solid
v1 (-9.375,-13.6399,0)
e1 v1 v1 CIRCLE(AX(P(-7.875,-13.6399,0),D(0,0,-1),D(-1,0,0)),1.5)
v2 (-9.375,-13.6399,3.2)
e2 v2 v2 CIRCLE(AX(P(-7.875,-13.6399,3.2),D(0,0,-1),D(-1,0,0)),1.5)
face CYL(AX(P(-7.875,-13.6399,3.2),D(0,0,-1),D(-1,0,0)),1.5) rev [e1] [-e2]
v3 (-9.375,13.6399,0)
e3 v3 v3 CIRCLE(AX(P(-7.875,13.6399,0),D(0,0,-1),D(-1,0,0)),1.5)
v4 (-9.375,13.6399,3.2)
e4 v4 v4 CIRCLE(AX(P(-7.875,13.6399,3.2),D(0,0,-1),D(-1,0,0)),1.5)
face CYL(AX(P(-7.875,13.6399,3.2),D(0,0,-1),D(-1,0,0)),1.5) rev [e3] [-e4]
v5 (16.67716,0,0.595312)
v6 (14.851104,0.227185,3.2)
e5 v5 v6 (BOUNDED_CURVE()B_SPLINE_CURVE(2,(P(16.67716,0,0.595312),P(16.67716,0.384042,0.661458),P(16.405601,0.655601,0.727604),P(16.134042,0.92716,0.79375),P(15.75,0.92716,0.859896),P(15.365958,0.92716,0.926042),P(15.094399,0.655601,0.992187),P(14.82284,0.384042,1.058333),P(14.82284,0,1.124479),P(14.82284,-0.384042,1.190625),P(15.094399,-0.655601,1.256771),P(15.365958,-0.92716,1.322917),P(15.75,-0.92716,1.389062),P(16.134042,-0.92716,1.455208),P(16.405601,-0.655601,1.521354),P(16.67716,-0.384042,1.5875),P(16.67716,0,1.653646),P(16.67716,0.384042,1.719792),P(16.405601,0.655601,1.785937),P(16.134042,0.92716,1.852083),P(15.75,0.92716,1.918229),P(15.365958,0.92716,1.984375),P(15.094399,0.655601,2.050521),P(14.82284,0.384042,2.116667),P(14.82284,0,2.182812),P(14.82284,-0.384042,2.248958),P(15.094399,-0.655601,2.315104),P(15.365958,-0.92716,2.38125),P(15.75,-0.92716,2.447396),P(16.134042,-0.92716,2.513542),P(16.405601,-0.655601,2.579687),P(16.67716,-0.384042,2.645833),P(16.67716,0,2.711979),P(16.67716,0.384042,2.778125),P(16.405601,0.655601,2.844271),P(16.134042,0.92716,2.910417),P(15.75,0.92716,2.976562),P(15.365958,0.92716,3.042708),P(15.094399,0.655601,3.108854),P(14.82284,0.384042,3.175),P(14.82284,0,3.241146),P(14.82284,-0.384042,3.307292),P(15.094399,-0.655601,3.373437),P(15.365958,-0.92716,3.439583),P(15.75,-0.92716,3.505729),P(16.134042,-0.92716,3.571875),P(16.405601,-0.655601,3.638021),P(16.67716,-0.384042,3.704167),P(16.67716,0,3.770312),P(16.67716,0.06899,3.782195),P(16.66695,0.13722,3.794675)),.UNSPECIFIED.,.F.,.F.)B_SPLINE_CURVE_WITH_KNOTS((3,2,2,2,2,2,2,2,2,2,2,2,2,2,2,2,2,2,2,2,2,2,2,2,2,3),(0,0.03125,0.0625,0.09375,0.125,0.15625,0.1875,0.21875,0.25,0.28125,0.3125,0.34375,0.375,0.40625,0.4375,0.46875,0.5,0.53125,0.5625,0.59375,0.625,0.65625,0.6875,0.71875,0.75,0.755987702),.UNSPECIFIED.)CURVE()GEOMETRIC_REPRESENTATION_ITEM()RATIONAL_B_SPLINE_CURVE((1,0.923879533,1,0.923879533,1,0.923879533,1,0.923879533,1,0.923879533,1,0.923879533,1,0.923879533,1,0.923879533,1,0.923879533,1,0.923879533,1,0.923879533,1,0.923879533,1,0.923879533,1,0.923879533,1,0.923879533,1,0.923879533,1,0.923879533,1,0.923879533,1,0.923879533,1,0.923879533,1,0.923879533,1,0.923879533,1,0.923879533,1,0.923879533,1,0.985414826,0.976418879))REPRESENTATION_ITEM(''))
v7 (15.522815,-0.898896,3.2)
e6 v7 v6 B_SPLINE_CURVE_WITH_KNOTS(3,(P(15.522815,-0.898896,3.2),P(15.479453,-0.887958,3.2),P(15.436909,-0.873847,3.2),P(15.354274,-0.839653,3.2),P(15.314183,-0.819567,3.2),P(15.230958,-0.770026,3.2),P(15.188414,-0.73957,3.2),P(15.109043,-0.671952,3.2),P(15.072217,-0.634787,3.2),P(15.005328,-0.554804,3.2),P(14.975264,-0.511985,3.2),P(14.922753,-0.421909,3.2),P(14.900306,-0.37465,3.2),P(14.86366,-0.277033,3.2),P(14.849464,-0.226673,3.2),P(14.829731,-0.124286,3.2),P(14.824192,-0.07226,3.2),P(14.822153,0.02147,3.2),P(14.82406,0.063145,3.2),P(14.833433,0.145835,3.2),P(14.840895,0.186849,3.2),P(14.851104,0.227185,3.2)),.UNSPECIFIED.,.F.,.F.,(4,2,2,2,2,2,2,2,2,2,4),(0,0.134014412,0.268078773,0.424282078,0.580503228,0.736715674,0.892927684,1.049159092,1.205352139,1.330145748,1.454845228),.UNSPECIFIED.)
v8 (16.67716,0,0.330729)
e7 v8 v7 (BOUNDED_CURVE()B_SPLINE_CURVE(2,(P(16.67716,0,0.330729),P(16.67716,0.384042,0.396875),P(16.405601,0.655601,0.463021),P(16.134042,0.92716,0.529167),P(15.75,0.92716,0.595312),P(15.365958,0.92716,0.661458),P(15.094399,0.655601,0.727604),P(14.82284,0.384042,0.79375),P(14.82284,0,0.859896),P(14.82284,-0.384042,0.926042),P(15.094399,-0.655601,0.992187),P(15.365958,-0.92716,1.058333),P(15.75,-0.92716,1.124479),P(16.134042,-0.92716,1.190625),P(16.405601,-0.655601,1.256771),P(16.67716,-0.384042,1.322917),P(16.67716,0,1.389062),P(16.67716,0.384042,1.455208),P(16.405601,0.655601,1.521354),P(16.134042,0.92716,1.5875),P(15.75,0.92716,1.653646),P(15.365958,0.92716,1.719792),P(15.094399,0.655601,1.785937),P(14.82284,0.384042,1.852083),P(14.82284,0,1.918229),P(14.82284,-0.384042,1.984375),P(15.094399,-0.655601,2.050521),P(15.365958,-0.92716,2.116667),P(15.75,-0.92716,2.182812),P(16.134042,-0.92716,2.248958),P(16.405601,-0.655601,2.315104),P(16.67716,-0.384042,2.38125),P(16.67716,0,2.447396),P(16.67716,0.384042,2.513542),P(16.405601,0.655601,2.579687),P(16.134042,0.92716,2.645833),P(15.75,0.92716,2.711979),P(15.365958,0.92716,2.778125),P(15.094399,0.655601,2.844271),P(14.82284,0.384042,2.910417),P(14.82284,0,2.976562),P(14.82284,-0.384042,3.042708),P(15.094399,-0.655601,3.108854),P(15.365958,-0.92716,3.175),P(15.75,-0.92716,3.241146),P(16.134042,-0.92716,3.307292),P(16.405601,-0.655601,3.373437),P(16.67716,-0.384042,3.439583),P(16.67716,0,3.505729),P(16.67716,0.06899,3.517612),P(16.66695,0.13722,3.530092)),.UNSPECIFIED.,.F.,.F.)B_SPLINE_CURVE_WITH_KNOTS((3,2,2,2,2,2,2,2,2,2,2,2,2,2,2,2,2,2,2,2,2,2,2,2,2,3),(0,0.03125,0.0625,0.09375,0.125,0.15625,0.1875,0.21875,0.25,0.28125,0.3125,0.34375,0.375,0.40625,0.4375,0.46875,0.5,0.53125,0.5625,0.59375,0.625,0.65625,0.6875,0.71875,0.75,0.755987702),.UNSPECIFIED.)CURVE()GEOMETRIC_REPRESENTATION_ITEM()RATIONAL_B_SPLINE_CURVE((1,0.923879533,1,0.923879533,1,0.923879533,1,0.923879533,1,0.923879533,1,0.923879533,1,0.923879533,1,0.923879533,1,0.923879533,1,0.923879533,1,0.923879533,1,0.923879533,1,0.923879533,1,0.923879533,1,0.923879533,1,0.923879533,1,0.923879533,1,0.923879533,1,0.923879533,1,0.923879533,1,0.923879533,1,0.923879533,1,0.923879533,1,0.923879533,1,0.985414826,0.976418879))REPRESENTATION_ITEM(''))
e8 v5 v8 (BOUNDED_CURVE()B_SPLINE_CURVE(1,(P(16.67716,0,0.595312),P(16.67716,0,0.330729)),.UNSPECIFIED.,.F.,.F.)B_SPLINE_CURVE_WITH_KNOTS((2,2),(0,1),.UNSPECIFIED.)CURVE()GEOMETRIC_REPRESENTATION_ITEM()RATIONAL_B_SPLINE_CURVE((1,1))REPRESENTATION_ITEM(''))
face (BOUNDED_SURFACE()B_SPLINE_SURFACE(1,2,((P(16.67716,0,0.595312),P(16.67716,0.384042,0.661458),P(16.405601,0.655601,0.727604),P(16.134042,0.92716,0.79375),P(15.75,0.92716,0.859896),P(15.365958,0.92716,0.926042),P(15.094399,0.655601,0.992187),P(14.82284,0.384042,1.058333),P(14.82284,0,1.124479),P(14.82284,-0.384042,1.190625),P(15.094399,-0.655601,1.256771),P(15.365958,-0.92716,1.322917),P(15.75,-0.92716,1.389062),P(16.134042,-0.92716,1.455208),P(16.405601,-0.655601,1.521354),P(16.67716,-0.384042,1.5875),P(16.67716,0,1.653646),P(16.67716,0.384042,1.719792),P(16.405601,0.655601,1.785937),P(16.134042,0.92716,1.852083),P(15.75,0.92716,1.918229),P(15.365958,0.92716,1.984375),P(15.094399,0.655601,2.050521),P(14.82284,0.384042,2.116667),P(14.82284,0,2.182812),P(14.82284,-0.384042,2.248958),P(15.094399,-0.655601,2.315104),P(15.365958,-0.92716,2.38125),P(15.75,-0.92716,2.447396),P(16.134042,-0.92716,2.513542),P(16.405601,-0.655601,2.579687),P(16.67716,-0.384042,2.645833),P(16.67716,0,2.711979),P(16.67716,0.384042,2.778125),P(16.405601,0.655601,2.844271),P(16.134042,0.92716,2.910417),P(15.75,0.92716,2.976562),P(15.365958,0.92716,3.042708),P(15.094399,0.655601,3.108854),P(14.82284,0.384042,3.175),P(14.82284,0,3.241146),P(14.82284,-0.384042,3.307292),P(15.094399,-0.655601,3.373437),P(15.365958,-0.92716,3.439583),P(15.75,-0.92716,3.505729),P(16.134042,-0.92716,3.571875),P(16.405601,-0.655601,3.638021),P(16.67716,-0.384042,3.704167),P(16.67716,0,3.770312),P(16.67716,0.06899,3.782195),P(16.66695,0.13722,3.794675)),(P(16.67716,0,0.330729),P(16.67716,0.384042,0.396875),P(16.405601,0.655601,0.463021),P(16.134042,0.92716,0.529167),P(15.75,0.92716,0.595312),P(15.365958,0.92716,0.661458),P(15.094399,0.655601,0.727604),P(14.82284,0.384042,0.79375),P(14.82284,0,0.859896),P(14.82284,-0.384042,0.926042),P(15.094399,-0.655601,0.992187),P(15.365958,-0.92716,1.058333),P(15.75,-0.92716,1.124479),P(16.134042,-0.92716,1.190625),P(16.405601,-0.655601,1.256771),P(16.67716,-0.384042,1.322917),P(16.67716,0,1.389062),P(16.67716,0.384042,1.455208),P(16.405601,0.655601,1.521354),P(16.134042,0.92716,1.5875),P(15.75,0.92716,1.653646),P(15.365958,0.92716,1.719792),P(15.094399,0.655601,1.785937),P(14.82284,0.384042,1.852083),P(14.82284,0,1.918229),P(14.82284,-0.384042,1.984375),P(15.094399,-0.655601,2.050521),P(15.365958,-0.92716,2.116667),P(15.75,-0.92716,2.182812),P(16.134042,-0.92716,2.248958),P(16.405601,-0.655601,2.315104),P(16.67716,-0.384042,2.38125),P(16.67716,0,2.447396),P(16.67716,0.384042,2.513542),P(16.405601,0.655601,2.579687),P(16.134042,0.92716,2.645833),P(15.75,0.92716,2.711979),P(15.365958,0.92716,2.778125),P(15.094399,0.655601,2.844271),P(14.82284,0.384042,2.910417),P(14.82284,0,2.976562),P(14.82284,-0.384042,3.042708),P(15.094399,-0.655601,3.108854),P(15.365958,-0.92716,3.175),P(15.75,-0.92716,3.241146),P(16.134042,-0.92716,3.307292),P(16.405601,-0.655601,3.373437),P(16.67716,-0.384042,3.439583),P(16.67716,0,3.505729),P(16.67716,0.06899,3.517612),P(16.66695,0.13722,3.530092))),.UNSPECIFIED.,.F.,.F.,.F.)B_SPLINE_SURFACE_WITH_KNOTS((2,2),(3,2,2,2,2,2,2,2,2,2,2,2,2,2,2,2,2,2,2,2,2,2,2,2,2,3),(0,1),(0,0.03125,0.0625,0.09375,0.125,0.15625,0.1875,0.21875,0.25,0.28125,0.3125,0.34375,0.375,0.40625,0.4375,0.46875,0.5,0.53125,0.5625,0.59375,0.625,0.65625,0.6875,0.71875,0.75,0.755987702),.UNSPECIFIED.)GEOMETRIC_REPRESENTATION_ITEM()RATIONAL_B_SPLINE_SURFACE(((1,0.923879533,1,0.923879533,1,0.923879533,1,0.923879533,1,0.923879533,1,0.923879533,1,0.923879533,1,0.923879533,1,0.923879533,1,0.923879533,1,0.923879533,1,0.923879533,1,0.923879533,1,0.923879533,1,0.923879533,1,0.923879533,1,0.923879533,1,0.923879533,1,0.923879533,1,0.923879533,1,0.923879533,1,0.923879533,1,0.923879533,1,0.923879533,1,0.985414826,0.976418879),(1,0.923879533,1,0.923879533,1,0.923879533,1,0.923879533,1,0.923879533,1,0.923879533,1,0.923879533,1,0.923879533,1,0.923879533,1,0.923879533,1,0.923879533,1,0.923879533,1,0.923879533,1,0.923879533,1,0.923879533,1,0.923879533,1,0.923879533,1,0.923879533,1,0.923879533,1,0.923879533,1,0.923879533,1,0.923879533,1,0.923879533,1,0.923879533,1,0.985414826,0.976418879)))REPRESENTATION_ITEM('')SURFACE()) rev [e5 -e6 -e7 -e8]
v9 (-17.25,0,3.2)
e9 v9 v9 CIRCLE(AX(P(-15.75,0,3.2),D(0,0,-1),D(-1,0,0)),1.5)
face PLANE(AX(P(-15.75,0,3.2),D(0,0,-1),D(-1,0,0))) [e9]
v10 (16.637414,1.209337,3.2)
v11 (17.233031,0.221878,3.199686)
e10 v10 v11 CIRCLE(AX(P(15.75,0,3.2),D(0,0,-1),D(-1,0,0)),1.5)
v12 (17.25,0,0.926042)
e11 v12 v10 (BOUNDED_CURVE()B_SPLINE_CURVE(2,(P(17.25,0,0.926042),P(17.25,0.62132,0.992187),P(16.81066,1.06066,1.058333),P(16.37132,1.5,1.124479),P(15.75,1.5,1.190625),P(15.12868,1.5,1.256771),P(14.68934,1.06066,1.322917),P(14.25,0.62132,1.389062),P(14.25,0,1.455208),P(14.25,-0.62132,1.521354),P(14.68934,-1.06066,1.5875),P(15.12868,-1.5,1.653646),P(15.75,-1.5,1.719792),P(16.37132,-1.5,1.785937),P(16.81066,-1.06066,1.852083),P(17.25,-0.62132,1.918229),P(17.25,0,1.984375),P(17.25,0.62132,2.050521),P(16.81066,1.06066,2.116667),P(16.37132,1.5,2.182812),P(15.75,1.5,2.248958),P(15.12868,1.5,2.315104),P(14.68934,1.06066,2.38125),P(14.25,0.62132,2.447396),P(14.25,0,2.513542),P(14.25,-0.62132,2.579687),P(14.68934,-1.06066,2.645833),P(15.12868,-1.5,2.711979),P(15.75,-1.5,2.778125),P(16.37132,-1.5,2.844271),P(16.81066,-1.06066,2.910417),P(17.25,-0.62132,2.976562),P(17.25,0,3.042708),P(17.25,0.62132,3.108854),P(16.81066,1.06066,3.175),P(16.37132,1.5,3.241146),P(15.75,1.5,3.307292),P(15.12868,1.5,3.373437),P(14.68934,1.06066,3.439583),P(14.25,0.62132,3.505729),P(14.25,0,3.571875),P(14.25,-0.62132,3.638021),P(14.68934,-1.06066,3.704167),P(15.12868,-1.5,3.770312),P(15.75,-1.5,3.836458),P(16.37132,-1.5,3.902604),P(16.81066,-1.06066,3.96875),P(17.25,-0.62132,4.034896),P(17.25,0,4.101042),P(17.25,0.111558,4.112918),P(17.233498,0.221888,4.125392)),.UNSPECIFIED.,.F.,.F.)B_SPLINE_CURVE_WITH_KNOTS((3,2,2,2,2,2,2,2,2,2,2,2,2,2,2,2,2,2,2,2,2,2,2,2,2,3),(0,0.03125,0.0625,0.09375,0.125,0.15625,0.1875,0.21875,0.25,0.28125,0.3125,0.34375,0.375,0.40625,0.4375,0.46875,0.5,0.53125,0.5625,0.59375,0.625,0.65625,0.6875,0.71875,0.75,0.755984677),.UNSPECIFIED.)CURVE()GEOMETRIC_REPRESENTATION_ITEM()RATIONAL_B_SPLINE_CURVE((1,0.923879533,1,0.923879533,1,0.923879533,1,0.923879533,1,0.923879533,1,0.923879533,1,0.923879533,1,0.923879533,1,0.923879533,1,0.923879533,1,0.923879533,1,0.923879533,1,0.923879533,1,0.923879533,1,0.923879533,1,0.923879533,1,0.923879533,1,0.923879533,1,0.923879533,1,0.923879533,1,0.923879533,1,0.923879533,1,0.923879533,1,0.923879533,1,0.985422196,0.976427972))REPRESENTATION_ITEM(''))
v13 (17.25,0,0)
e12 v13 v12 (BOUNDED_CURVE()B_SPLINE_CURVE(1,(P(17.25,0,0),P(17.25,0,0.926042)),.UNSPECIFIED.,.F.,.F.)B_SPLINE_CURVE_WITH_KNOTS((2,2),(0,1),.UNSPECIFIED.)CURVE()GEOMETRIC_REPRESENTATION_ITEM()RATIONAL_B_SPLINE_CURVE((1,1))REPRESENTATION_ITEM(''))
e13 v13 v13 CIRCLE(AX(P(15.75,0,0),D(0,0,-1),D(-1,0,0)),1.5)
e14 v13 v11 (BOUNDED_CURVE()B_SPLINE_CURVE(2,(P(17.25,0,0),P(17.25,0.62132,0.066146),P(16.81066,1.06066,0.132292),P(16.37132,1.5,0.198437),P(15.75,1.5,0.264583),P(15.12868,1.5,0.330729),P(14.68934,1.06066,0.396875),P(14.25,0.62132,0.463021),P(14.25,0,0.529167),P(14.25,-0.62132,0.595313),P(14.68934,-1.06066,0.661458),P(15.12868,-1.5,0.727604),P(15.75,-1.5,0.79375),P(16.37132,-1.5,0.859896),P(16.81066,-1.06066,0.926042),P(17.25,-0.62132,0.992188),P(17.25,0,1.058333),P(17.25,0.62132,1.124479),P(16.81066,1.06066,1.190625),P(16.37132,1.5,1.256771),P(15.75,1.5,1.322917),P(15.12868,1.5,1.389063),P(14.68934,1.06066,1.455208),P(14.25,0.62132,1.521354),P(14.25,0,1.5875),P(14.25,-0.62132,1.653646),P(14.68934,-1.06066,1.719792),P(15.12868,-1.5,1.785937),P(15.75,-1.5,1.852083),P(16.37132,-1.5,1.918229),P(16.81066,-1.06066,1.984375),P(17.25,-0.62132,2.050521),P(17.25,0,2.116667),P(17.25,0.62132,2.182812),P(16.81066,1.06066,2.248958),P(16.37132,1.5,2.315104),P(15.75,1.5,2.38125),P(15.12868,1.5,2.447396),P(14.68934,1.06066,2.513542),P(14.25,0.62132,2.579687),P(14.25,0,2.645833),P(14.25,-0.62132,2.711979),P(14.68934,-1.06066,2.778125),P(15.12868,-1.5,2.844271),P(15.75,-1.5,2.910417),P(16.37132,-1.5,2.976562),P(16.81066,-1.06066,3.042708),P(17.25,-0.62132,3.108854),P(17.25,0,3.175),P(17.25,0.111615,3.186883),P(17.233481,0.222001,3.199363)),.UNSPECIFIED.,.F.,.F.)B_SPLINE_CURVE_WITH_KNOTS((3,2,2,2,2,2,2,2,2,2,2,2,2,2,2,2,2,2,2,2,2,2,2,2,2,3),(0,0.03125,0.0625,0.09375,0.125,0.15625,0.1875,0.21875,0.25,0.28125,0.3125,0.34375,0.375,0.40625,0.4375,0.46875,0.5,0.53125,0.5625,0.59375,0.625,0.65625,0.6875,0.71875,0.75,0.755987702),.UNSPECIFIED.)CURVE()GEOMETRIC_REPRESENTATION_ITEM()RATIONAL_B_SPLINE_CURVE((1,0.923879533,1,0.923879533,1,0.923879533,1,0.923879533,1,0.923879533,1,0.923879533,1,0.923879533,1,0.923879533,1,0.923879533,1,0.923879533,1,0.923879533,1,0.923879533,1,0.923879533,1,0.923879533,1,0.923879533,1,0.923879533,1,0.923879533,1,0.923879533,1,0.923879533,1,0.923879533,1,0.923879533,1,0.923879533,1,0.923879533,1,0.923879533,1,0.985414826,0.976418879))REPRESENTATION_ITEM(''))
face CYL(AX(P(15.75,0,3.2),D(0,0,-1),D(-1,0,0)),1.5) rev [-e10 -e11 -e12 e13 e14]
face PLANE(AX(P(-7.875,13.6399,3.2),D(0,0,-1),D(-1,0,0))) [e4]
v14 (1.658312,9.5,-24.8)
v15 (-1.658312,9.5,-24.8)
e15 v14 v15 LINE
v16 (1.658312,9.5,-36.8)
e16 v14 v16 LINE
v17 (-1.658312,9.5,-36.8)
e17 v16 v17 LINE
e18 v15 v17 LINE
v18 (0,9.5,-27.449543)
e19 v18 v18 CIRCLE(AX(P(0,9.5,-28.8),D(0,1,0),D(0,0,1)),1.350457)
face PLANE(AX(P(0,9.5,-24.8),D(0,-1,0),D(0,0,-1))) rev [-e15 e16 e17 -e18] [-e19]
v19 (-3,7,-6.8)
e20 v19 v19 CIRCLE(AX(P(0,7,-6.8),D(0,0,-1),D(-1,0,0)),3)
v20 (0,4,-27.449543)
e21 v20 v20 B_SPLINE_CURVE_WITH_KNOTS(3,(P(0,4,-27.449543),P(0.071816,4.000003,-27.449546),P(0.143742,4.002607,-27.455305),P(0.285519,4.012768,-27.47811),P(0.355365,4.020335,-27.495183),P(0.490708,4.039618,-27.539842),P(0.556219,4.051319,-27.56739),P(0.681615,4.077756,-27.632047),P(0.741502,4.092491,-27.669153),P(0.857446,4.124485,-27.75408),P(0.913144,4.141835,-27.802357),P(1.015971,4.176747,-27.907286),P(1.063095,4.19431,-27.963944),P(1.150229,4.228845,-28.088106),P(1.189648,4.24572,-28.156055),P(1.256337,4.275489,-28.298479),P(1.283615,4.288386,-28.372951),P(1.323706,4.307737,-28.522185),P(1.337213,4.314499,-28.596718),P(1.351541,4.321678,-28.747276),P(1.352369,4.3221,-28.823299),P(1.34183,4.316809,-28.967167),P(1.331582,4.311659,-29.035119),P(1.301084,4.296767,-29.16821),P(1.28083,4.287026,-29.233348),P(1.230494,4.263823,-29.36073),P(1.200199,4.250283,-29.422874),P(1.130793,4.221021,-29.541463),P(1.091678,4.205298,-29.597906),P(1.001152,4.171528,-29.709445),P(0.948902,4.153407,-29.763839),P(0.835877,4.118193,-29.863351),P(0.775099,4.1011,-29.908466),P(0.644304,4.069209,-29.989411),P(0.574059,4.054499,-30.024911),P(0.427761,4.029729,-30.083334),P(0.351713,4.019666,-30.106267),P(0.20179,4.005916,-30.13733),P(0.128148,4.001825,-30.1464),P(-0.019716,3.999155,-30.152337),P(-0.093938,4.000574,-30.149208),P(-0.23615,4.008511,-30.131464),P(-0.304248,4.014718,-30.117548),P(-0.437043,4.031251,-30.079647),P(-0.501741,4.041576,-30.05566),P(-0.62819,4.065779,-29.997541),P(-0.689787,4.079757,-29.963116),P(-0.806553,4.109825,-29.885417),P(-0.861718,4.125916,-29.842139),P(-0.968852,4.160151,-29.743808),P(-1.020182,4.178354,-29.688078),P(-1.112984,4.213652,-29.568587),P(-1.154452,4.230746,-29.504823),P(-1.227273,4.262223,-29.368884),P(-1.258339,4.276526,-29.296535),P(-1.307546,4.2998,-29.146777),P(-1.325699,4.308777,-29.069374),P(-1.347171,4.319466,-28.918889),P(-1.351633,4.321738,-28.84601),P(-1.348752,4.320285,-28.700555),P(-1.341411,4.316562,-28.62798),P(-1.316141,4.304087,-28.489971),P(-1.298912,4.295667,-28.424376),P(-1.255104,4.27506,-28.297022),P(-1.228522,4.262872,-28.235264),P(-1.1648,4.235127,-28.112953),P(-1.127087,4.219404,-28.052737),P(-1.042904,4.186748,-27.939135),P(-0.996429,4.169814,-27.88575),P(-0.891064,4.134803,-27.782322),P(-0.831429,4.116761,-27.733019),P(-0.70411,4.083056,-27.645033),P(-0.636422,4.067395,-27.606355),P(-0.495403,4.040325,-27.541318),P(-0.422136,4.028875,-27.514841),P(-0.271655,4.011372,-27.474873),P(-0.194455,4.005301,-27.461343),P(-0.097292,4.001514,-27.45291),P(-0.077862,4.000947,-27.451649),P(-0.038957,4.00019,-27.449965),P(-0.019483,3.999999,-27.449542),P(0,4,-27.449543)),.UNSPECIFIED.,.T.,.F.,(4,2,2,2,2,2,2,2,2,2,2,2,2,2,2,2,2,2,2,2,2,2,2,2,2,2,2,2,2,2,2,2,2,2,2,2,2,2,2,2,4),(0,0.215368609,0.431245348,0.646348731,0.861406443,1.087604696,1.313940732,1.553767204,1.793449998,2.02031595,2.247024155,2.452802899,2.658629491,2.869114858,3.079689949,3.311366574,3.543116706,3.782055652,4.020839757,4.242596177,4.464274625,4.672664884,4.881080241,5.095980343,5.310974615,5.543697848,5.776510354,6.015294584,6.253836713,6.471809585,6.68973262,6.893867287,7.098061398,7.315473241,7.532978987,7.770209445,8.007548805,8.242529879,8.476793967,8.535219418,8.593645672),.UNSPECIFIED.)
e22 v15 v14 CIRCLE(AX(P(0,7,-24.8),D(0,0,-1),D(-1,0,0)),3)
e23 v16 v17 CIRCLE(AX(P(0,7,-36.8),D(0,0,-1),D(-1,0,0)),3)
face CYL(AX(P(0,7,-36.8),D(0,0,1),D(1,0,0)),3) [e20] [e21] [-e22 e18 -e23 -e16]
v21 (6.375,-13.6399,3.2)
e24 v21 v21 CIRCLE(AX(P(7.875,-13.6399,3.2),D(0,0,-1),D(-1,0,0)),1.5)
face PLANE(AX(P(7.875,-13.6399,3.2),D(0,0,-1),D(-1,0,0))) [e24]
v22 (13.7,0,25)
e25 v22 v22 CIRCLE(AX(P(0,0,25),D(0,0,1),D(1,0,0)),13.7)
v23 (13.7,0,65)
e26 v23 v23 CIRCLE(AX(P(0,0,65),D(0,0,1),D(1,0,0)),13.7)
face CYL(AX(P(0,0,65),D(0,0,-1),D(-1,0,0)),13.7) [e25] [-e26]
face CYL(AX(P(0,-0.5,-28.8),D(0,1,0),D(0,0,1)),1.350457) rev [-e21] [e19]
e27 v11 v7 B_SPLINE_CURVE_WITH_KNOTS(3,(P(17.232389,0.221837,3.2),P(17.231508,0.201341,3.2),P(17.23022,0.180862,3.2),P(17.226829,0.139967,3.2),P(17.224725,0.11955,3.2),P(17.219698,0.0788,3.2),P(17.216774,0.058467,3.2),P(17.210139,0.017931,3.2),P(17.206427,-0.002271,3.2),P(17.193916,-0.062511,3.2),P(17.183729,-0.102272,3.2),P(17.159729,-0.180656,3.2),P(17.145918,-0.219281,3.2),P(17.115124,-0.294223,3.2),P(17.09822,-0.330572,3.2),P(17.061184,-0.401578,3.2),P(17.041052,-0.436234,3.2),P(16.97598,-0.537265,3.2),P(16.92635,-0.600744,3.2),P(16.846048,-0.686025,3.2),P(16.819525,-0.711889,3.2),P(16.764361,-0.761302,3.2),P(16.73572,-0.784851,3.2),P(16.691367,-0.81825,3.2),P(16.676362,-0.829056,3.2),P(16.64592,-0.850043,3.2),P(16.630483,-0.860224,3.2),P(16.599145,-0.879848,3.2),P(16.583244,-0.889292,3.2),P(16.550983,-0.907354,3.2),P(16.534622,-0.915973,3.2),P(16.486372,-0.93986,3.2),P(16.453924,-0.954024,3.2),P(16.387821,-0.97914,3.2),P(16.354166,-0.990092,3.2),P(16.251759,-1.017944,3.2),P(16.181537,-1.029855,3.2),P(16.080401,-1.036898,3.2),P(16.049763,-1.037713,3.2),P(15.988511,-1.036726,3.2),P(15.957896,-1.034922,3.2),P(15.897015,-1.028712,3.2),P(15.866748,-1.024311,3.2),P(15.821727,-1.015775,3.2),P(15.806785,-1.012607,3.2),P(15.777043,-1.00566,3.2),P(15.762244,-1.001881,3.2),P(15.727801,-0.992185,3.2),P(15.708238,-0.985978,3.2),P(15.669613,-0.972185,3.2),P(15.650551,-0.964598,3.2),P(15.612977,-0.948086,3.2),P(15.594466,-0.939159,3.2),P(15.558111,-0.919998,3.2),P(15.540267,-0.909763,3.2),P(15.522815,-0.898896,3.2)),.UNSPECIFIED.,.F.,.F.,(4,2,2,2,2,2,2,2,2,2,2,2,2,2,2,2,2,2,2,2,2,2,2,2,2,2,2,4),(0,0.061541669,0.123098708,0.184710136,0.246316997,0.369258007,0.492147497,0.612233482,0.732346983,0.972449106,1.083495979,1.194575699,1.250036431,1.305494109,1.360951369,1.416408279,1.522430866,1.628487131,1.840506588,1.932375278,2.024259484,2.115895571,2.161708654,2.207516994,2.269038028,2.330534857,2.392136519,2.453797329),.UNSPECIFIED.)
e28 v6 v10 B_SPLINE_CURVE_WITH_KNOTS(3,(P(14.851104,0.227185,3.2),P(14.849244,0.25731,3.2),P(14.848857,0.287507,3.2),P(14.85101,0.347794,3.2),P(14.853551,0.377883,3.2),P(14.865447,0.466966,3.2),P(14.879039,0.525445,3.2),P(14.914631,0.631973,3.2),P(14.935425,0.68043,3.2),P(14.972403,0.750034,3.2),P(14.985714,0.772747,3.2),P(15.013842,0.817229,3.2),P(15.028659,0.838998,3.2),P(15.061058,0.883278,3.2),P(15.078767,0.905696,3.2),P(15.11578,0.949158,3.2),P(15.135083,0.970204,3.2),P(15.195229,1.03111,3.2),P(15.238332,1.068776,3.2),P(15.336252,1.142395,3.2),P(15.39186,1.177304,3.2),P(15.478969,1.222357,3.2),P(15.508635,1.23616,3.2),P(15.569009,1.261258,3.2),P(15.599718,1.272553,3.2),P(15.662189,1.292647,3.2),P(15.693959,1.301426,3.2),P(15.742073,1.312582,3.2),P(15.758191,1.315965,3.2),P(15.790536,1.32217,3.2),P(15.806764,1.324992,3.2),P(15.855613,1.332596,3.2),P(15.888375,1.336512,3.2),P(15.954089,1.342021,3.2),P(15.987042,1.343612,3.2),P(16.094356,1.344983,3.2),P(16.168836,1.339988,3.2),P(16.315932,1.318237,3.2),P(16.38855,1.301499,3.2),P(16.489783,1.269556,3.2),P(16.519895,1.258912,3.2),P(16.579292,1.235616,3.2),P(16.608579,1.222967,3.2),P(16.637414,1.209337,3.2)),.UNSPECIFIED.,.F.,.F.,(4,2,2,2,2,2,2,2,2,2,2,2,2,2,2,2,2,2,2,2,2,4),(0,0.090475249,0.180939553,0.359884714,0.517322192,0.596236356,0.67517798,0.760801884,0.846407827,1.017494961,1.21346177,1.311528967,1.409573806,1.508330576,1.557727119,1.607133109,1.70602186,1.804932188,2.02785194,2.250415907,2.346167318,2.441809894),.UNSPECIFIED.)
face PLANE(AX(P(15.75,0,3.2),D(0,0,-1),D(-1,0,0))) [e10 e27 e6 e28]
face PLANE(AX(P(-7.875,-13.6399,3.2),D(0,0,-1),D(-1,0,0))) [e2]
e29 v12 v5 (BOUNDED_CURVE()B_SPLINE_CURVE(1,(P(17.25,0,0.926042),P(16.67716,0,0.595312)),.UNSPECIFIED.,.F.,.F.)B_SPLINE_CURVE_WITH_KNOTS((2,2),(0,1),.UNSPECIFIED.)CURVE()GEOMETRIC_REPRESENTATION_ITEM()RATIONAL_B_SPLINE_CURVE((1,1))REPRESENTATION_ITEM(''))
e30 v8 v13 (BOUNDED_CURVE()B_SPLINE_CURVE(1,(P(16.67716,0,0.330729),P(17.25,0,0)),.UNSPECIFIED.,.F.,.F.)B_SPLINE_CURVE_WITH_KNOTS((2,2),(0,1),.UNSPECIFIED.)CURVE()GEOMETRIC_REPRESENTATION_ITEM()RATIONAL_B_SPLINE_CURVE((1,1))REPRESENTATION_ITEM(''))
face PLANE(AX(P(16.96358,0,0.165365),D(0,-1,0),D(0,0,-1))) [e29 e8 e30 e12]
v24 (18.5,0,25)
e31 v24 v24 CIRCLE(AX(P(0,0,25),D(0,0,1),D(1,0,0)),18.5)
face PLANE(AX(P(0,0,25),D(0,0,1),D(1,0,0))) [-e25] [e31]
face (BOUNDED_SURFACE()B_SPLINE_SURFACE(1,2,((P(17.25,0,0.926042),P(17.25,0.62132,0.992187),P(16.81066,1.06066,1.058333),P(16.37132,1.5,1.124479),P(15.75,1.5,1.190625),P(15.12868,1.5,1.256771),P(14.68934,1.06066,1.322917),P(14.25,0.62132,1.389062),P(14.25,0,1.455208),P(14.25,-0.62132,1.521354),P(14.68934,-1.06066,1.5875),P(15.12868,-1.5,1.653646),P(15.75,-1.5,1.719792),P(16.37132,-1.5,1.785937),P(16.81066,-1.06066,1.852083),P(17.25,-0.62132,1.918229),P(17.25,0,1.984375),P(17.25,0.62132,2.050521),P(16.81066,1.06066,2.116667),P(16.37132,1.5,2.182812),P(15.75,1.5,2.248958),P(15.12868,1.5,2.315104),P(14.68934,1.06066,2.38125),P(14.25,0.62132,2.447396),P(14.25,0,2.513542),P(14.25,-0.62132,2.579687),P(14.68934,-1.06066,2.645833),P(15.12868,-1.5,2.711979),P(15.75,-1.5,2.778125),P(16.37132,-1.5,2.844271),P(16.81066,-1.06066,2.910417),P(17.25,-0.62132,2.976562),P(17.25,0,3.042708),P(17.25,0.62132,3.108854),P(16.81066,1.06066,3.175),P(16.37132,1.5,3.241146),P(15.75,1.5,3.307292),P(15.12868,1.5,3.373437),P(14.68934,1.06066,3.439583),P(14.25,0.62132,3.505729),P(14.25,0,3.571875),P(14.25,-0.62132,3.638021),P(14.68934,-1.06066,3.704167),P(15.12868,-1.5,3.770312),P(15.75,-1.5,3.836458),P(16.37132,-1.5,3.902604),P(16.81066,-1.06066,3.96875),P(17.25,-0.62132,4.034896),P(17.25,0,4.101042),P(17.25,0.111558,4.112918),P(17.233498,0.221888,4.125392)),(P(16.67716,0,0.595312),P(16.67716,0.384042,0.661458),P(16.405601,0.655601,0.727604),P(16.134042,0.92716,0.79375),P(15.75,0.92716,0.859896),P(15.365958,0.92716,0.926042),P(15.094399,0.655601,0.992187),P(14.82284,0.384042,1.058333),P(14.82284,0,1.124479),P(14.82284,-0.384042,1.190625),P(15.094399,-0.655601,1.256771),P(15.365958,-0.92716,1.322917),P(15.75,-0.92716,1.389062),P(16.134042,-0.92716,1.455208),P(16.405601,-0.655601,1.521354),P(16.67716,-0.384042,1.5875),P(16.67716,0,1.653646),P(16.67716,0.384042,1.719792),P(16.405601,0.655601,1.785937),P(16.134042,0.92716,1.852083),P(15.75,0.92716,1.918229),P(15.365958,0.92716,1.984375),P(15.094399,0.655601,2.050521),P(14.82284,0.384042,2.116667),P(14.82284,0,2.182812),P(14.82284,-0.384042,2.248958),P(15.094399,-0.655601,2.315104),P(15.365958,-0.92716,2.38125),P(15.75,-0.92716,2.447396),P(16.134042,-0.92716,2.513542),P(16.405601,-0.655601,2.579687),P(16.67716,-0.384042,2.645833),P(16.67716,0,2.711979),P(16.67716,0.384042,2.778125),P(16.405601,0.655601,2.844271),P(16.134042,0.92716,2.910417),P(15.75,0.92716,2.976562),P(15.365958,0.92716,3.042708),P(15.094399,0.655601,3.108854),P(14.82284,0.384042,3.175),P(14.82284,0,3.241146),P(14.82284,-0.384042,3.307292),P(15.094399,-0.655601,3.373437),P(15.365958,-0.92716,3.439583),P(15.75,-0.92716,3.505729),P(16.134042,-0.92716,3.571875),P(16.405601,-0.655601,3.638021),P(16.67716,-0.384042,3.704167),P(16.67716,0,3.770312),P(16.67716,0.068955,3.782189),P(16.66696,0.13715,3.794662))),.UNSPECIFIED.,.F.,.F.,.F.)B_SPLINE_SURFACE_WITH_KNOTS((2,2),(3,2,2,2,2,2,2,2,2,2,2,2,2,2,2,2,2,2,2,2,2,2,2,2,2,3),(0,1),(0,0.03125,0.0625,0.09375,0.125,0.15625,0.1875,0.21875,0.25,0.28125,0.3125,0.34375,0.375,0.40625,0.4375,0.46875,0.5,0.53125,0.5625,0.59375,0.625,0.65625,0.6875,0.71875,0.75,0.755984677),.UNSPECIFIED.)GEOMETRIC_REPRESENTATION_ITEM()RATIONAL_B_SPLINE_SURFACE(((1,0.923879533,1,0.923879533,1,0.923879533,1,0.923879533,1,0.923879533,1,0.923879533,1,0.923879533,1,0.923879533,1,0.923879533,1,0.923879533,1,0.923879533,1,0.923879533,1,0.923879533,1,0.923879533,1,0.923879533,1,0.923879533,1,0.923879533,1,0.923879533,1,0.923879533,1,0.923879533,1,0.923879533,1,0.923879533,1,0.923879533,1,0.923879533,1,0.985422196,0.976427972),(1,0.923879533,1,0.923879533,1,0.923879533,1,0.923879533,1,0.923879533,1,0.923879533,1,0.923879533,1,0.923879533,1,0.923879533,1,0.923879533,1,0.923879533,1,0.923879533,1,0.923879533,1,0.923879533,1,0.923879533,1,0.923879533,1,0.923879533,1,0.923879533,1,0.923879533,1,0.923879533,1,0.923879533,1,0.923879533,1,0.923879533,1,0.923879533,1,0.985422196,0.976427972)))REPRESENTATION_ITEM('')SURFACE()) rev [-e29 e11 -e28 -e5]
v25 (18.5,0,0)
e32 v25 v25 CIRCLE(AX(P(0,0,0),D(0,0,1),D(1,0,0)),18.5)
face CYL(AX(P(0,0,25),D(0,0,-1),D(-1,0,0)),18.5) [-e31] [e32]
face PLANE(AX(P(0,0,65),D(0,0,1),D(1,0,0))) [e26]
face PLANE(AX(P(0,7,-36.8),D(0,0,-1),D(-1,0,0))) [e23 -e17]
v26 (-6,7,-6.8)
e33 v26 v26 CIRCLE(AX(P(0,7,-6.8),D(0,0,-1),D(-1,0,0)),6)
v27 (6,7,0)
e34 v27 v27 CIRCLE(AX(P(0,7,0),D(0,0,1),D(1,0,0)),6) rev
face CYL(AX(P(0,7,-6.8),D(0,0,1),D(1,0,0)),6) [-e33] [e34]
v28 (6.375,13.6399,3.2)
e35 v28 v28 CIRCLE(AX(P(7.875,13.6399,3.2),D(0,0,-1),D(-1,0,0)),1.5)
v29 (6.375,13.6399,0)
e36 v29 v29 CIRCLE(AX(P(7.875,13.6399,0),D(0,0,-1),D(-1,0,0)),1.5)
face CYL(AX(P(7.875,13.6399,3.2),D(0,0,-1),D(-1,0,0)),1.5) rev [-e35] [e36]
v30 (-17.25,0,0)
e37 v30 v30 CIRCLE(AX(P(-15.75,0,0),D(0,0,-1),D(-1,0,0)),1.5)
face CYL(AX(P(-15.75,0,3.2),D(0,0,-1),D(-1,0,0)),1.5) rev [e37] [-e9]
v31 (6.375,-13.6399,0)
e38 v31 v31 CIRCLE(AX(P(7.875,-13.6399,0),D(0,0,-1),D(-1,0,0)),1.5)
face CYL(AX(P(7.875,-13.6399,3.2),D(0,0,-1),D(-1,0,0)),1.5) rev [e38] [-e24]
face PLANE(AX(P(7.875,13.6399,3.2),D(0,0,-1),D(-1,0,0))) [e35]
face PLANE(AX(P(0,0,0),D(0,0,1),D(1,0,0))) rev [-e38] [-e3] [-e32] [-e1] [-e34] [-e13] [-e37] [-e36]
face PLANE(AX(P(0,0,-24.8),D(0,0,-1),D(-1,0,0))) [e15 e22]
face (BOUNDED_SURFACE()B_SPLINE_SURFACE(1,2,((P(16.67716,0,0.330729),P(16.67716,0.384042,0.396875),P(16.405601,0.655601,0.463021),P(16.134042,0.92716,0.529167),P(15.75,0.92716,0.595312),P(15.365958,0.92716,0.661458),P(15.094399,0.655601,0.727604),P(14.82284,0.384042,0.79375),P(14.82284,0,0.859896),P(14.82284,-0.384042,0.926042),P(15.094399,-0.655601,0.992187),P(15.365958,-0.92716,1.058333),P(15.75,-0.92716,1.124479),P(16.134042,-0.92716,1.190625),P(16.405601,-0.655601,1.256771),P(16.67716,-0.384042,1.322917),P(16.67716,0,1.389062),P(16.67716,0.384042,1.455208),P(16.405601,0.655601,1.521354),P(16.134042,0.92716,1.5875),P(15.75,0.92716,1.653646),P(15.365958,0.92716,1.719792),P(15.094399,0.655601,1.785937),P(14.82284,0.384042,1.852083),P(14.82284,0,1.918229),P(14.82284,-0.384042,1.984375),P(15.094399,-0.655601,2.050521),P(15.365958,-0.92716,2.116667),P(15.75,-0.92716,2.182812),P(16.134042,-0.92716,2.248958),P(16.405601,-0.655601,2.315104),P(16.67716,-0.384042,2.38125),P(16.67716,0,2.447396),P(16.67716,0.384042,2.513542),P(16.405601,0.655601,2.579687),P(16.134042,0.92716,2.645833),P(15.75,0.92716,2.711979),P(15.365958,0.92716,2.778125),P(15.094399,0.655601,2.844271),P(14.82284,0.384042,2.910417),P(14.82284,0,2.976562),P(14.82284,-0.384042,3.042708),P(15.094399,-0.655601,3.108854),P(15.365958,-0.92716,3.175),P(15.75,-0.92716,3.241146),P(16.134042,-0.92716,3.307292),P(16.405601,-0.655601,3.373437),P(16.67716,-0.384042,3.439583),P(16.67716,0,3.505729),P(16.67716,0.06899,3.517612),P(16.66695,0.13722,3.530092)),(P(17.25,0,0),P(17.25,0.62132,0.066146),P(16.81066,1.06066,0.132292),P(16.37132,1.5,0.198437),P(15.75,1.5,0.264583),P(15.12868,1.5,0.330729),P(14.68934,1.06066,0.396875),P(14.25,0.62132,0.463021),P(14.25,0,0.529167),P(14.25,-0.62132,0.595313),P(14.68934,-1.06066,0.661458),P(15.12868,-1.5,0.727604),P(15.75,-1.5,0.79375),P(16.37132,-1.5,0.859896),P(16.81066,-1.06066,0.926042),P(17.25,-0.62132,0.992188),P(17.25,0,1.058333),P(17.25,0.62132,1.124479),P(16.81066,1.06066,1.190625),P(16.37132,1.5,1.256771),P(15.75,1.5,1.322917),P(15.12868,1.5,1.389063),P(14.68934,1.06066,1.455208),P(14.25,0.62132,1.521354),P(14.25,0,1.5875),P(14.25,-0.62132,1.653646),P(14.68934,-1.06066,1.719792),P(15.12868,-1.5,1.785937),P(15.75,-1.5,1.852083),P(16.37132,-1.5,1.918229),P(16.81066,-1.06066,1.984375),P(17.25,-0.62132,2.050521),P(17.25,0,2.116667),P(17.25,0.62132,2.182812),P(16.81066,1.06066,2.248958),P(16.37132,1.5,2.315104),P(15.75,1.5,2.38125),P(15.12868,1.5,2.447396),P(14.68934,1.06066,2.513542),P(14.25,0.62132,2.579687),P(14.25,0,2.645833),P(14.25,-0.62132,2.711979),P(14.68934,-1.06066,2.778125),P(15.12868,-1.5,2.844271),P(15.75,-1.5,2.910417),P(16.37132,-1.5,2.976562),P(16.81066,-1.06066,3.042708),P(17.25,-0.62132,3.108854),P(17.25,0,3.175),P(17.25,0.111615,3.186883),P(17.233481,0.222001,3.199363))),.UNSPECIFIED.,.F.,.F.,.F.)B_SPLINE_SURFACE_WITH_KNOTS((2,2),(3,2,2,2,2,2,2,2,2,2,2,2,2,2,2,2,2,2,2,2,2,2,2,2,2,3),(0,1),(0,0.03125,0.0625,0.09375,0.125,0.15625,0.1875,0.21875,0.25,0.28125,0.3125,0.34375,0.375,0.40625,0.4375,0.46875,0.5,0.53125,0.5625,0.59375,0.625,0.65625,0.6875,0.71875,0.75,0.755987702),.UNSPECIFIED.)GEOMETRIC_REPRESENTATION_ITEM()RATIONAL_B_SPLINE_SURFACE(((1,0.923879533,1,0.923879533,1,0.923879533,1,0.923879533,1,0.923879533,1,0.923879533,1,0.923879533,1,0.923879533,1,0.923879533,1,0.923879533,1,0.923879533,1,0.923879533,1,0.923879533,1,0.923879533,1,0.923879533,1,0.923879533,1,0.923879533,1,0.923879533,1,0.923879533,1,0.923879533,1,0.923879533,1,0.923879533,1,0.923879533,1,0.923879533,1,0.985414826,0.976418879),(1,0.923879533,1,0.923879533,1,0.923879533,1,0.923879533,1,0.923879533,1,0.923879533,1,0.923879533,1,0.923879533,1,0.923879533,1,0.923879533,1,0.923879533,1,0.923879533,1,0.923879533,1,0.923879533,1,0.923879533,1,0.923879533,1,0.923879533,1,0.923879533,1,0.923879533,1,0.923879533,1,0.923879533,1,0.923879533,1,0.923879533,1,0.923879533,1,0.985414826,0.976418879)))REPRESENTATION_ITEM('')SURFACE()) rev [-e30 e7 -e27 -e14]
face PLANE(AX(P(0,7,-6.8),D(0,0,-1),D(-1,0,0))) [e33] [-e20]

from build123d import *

# Parameters (mm, degrees)
SKETCH1_R           = 18.5
BOSS_EXTRUDE1_DEPTH = 25
SKETCH2_R           = 6
BOSS_EXTRUDE2_DEPTH = 6.8
SKETCH3_R           = 3
BOSS_EXTRUDE3_DEPTH = 30
CUT_EXTRUDE1_DEPTH  = 12
SKETCH5_R           = 13.7
BOSS_EXTRUDE4_DEPTH = 40
SKETCH6_R           = 1.5
CUT_EXTRUDE2_DEPTH  = 3.2
THREAD1_PITCH       = 1.058333333
SKETCH7_R           = 1.350457069
CUT_EXTRUDE3_DEPTH  = 10


with BuildPart() as part:
    # Sketch1 → Boss-Extrude1 (new body)
    with BuildSketch(Plane.XY):
        Circle(SKETCH1_R)
    extrude(amount=BOSS_EXTRUDE1_DEPTH)

    # Sketch2 → Boss-Extrude2 (add)
    with BuildSketch(Plane(origin=(0, 0, 0), x_dir=(-1, 0, 0), z_dir=(0, 0, -1))):
        with Locations(Location((0, 7, 0), (0, 0, 180))):
            Circle(SKETCH2_R)
    extrude(amount=BOSS_EXTRUDE2_DEPTH)

    # Sketch3 → Boss-Extrude3 (add)
    with BuildSketch(Plane(origin=(0, 0, -6.8), x_dir=(-1, 0, 0), z_dir=(0, 0, -1))):
        with Locations((0, 7)):
            Circle(SKETCH3_R)
    extrude(amount=BOSS_EXTRUDE3_DEPTH)

    # Sketch4 → Cut-Extrude1 (cut)
    with BuildSketch(Plane(origin=(0, 0, -36.8), x_dir=(-1, 0, 0), z_dir=(0, 0, -1))):
        Polygon((-80.661429966, 9.5), (-1.658312395, 9.5), (1.658312395, 9.5), (80.661429966, 9.5), (80.661429966, 167.506235142), (-80.661429966, 167.506235142), align=None)
    extrude(amount=-CUT_EXTRUDE1_DEPTH, mode=Mode.SUBTRACT)

    # Sketch5 → Boss-Extrude4 (add)
    with BuildSketch(Plane.XY.offset(25)):
        Circle(SKETCH5_R)
    extrude(amount=BOSS_EXTRUDE4_DEPTH)

    # Sketch6 → Cut-Extrude2 (cut)
    with BuildSketch(Plane(origin=(0, 0, 0), x_dir=(-1, 0, 0), z_dir=(0, 0, -1))):
        with Locations((-15.75, 0)):
            Circle(SKETCH6_R)
        with Locations((-7.875, 13.63990011)):
            Circle(SKETCH6_R)
        with Locations((7.875, 13.63990011)):
            Circle(SKETCH6_R)
        with Locations((15.75, 0)):
            Circle(SKETCH6_R)
        with Locations((7.875, -13.63990011)):
            Circle(SKETCH6_R)
        with Locations((-7.875, -13.63990011)):
            Circle(SKETCH6_R)
    extrude(amount=-CUT_EXTRUDE2_DEPTH, mode=Mode.SUBTRACT)

    # Thread1: the profile of Thread Profile1 profile screwed along a right-hand helix of 3.023622 turns, 8 arcs to a turn; built about Z, then put on its axis
    thread1_z = Axis((0, 0, 0), (0, 0, 1))
    thread1_corners = [(1.5003, 0, -0.000173205), (1.5003, 0, 0.926214869), (0.927160282, 0, 0.595312499), (0.927160282, 0, 0.330729165)]
    with BuildLine(mode=Mode.PRIVATE) as thread1_profile:
        Line(thread1_corners[0], thread1_corners[1])
        Line(thread1_corners[1], thread1_corners[2])
        Line(thread1_corners[2], thread1_corners[3])
        Line(thread1_corners[3], thread1_corners[0])
    thread1_cap = Face(thread1_profile.wire())
    thread1_turn_angles = [0, 22.5, 45, 67.5, 90, 112.5, 135, 157.5, 180, 202.5, 225, 247.5, 270, 292.5, 315, 337.5, 360]
    thread1_turn_weights = [1, 0.9238795325112867, 1, 0.9238795325112867, 1, 0.9238795325112867, 1, 0.9238795325112867, 1, 0.9238795325112867, 1, 0.9238795325112867, 1, 0.9238795325112867, 1, 0.9238795325112867, 1]
    thread1_turn_rails = [Edge.make_bspline([Vector(p[0], p[1], 0).rotate(thread1_z, thread1_turn_angles[k]) / thread1_turn_weights[k] + Vector(0, 0, p[2] + THREAD1_PITCH * thread1_turn_angles[k] / 360) for k in range(17)], [0, 0, 0, 1, 1, 2, 2, 3, 3, 4, 4, 5, 5, 6, 6, 7, 7, 8, 8, 8], 2, thread1_turn_weights) for p in thread1_corners]
    thread1_turn_sides = [Face.make_surface_from_curves(thread1_turn_rails[p[0]], thread1_turn_rails[p[1]]) for p in [(0, 1), (1, 2), (2, 3), (3, 0)]]
    thread1_last_angles = [1080, 1084.251968504, 1088.503937008]
    thread1_last_weights = [1, 0.9972476383747746, 1]
    thread1_last_rails = [Edge.make_bspline([Vector(p[0], p[1], 0).rotate(thread1_z, thread1_last_angles[k]) / thread1_last_weights[k] + Vector(0, 0, p[2] + THREAD1_PITCH * thread1_last_angles[k] / 360) for k in range(3)], [0, 0, 0, 1, 1, 1], 2, thread1_last_weights) for p in thread1_corners]
    thread1_last_sides = [Face.make_surface_from_curves(thread1_last_rails[p[0]], thread1_last_rails[p[1]]) for p in [(0, 1), (1, 2), (2, 3), (3, 0)]]
    thread1 = Plane(origin=(15.75, 0, 0), x_dir=(1, 0, 0), z_dir=(0, 0, 1)) * Solid(Shell([*[p.moved(Location((0, 0, THREAD1_PITCH * i))) for i in range(3) for p in thread1_turn_sides], *thread1_last_sides, thread1_cap, thread1_cap.rotate(thread1_z, 1088.503937008).moved(Location((0, 0, THREAD1_PITCH * 1088.503937008 / 360)))]))
    add(thread1)

    # Sketch7 → Cut-Extrude3 (cut)
    with BuildSketch(Plane(origin=(0, 9.5, 0), x_dir=(1, 0, 0), z_dir=(0, 1, 0))):
        with Locations(Location((0, 28.8, 0), (0, 0, 270))):
            Circle(SKETCH7_R)
    extrude(amount=-CUT_EXTRUDE3_DEPTH, mode=Mode.SUBTRACT)


solid = part.part
